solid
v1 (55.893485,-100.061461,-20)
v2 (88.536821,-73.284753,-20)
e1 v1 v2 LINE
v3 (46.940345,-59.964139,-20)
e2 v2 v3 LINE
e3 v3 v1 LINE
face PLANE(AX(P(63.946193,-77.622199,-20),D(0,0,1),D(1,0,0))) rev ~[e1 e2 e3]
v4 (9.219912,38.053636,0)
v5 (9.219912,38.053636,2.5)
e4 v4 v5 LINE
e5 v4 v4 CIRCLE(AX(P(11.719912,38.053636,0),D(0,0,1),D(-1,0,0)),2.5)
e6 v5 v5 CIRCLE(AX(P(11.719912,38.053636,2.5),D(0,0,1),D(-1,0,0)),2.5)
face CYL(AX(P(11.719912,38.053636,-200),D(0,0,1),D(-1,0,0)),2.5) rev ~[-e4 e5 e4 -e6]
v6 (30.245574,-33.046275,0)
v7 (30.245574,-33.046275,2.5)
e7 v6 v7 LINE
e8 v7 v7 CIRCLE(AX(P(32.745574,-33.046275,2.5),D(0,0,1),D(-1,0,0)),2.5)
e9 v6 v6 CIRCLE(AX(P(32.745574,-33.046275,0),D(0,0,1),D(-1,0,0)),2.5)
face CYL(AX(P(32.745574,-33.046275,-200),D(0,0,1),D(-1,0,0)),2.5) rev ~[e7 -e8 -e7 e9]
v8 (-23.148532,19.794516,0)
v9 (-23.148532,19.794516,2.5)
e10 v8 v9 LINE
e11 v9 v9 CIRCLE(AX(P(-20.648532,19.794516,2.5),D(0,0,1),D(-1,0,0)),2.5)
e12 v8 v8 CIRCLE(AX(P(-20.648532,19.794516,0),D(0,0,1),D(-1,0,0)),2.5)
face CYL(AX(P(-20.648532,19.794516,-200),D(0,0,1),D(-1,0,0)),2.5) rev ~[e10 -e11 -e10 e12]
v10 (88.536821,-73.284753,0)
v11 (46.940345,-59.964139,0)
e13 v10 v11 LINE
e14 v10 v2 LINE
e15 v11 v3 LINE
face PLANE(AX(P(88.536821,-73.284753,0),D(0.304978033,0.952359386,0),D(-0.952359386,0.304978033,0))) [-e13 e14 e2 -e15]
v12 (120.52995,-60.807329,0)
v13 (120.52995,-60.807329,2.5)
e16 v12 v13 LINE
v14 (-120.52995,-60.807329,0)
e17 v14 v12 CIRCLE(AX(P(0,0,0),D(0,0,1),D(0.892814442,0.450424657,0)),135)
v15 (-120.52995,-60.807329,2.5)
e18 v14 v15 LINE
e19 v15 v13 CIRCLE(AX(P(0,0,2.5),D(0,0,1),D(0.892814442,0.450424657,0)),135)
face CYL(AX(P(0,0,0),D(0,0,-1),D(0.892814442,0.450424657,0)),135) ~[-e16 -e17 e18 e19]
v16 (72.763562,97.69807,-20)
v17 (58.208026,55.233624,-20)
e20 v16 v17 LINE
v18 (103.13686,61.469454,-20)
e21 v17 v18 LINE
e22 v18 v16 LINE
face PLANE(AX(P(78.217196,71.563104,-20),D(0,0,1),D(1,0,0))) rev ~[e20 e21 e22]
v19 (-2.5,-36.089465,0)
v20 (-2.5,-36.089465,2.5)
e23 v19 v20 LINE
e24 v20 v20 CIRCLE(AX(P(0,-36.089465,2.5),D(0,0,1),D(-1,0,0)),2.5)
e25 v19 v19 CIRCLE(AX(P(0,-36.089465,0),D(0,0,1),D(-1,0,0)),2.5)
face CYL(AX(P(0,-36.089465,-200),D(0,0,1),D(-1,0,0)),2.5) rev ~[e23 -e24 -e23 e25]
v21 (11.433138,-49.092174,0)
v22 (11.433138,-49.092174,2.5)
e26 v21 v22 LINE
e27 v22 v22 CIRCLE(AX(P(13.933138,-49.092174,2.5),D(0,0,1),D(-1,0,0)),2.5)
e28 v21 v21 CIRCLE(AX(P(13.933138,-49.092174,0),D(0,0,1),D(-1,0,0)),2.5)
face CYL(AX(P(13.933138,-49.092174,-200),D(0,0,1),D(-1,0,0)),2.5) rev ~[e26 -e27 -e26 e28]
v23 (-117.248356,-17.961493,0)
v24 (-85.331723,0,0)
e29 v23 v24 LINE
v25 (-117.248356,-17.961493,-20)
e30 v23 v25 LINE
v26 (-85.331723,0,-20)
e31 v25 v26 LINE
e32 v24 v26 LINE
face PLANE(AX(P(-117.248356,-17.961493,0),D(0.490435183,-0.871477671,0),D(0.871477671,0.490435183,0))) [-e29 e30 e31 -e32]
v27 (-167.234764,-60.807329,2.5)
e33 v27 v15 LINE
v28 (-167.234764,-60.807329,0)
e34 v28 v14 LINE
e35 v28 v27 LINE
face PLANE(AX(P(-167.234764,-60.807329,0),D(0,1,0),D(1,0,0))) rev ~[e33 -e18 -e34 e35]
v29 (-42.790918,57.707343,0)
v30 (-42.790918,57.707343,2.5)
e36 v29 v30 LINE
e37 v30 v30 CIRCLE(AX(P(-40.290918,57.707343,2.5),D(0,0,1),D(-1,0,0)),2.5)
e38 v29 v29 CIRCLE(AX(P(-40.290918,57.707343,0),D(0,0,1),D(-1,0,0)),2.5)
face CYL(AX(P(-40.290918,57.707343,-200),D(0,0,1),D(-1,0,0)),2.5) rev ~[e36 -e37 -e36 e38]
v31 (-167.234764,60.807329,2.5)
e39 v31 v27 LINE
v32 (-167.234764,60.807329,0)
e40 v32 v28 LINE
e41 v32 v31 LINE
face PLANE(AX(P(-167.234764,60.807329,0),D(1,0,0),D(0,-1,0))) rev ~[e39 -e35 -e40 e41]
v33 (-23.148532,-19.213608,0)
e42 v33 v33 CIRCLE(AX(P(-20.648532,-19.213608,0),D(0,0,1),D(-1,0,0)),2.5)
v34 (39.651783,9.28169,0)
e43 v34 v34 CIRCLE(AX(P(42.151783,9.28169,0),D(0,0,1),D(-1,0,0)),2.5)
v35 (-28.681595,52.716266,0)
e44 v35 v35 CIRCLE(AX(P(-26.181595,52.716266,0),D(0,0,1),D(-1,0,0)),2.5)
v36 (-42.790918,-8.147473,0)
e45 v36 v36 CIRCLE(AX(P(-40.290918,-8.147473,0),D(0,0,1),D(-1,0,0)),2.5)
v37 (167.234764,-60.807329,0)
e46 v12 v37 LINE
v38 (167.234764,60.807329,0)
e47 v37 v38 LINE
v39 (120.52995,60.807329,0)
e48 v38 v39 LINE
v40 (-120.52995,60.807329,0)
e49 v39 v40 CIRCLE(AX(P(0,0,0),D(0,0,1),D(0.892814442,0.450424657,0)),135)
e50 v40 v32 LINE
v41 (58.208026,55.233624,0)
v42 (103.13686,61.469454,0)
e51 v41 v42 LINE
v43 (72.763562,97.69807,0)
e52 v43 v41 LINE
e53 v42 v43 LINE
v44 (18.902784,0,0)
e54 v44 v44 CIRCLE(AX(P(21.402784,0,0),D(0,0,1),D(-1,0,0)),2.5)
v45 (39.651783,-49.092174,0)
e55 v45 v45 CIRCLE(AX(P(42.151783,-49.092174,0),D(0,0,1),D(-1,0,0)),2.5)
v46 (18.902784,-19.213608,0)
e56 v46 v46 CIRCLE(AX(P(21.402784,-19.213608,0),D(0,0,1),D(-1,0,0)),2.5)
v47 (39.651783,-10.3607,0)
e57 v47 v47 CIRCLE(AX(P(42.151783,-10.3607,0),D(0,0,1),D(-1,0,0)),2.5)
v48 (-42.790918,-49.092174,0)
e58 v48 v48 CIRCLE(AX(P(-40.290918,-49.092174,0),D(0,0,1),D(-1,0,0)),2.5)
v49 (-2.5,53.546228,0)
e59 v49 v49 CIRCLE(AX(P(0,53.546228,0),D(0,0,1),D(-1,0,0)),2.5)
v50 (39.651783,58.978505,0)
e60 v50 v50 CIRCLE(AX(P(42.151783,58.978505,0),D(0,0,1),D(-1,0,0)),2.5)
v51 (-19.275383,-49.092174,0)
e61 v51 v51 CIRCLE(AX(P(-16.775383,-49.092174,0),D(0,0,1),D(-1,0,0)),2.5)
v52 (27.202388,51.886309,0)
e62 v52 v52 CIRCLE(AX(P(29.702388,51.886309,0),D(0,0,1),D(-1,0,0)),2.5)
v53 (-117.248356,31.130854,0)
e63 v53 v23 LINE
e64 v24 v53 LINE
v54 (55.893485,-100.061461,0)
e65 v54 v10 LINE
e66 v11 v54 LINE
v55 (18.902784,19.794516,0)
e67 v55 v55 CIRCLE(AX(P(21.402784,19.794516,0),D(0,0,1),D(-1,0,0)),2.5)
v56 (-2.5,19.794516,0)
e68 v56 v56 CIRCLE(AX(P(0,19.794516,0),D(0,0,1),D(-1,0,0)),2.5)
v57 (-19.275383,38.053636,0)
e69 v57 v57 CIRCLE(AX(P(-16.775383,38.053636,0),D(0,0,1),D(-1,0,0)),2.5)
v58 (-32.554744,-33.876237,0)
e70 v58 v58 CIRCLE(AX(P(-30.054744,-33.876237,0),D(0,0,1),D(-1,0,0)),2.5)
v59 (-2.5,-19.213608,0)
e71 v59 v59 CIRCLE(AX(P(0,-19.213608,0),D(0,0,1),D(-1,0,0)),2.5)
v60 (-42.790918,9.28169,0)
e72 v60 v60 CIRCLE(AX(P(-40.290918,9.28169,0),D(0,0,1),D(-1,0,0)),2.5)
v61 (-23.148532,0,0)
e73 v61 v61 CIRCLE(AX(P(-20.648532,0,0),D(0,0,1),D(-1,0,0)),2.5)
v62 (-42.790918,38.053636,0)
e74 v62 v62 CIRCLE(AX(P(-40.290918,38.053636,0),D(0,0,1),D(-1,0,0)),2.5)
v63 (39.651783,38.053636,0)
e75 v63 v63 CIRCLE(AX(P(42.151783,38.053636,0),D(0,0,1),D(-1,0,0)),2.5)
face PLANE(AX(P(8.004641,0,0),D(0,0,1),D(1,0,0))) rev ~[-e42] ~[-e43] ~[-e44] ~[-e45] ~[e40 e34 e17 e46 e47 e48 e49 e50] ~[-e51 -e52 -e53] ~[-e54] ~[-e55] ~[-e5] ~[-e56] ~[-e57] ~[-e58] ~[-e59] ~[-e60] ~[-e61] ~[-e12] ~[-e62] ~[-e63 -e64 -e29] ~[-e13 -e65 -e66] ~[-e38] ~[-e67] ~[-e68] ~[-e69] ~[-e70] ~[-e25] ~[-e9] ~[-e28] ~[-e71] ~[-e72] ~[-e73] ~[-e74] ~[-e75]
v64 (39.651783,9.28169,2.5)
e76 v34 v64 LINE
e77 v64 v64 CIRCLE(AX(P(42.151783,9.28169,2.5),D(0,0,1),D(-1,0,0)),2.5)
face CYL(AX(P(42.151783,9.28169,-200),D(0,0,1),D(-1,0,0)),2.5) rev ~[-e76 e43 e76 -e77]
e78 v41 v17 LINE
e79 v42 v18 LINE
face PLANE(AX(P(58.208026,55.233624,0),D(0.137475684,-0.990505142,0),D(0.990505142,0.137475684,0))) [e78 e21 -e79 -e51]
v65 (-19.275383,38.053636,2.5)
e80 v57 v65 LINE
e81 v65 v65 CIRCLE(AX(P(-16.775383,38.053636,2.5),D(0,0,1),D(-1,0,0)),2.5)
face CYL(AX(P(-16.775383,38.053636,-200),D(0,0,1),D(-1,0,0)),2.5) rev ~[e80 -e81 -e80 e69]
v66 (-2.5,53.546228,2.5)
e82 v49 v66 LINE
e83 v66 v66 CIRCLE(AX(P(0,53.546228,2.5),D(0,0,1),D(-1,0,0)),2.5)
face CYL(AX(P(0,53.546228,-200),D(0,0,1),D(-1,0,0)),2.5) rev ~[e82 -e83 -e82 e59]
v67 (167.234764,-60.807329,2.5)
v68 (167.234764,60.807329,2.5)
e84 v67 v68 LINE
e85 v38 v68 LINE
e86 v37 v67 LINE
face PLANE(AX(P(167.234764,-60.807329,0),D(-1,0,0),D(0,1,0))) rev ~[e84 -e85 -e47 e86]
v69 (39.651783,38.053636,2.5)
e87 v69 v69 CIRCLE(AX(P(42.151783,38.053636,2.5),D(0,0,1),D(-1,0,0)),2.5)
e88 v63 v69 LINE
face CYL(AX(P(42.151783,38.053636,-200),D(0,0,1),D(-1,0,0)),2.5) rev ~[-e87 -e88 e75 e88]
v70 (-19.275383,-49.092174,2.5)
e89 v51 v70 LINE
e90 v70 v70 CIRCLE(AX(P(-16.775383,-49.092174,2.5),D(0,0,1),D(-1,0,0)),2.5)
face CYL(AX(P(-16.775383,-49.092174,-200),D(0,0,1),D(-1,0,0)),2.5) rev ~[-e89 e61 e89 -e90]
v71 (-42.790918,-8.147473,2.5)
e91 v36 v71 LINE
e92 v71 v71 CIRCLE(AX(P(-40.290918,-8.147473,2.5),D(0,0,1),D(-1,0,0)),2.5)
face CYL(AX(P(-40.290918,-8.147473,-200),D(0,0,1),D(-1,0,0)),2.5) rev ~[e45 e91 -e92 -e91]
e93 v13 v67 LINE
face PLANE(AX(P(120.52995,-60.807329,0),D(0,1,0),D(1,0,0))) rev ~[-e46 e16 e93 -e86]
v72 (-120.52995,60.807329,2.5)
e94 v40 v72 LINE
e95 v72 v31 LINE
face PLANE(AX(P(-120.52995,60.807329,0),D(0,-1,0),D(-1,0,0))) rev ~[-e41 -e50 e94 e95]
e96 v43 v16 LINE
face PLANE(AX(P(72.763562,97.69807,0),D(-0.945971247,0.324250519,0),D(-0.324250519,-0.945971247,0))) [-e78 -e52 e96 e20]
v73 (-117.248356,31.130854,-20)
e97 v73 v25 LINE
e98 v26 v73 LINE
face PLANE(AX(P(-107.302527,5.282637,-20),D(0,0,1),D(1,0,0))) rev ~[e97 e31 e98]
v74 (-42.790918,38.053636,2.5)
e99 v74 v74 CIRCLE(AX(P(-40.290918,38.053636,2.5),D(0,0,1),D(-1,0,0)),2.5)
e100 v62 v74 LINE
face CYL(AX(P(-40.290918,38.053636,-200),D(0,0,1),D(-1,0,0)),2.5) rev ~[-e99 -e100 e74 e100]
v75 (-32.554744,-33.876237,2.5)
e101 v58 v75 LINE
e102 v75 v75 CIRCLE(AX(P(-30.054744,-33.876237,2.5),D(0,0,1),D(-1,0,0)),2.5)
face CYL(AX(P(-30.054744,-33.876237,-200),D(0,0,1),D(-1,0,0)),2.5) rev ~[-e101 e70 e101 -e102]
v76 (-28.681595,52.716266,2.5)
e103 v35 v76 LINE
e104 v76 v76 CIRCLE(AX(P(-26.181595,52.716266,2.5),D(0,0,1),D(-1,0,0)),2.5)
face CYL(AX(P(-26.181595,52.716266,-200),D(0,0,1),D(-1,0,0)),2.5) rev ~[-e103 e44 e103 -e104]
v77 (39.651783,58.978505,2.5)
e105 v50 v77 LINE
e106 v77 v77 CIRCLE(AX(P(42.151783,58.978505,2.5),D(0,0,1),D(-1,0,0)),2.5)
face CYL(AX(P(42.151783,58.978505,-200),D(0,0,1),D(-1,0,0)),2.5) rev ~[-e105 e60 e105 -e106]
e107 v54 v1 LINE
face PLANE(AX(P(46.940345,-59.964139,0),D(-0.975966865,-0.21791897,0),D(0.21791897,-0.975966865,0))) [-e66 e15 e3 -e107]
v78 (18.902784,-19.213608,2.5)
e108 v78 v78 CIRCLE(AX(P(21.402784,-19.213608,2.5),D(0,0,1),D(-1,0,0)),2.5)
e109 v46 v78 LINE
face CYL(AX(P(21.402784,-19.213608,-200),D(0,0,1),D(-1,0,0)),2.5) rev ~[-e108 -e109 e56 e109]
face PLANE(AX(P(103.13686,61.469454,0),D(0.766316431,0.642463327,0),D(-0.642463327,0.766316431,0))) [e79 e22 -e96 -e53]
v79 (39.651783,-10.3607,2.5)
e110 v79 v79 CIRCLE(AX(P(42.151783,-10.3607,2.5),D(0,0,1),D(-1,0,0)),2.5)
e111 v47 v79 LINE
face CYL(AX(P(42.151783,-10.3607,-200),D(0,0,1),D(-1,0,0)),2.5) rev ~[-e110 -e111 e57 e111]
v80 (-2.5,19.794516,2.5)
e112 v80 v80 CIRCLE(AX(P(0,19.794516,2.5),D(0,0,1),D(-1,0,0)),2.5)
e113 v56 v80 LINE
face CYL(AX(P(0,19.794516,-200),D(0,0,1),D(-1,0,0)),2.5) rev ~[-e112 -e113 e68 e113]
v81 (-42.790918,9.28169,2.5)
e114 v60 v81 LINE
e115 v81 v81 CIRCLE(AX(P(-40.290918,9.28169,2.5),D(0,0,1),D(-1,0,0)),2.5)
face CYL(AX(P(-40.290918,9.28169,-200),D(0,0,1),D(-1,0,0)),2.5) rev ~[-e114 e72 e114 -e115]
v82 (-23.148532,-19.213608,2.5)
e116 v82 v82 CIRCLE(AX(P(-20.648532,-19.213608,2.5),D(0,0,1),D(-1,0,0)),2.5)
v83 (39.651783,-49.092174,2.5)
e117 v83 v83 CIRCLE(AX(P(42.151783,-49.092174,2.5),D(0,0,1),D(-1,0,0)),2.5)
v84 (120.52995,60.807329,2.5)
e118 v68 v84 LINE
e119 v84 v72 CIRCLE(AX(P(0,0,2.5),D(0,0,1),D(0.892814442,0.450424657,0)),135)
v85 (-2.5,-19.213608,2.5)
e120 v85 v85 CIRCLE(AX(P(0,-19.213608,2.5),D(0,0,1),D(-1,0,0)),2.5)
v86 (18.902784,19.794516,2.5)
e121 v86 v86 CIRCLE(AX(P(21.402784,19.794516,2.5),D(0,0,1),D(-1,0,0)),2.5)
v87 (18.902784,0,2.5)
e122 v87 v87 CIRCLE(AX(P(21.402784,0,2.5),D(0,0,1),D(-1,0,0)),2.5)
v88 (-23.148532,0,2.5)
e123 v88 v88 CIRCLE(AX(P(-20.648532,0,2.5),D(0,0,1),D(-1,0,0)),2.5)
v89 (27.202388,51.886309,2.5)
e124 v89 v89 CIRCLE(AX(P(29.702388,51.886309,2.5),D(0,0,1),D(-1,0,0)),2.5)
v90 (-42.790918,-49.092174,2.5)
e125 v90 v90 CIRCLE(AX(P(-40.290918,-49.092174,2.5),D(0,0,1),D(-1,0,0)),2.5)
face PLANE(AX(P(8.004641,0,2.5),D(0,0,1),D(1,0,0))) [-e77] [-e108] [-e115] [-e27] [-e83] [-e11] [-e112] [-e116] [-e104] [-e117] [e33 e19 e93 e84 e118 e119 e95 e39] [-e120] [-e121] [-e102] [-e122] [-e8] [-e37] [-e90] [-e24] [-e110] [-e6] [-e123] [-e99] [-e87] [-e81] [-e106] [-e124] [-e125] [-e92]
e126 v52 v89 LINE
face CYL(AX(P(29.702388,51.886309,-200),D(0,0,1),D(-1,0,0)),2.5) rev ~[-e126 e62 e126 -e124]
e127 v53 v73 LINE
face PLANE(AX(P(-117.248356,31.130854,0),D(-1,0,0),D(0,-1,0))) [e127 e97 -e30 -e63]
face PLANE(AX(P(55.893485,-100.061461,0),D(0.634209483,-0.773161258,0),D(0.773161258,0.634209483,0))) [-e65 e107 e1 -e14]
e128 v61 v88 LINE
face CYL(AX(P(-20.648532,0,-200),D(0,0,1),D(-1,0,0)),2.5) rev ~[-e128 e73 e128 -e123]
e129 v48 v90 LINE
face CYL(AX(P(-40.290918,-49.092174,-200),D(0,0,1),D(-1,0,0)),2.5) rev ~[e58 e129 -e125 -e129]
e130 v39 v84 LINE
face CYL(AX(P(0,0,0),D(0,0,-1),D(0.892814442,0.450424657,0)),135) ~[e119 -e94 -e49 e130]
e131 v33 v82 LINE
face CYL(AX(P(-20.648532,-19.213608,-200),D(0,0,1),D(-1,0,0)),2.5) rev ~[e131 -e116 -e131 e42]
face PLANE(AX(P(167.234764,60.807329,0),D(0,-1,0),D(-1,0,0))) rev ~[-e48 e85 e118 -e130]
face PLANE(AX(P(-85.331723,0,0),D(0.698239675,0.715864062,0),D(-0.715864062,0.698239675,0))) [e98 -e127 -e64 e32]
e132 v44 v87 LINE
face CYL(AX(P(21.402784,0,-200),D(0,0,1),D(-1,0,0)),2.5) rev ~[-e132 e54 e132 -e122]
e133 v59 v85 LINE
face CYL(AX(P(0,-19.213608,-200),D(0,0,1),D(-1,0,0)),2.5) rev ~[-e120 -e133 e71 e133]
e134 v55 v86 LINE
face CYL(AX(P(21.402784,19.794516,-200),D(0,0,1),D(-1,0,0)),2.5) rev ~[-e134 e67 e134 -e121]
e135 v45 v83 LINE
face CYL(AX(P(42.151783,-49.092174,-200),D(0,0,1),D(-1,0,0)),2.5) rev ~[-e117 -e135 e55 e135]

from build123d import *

# Parameters (mm, degrees)
F1_DEPTH = 2.5
F2_DEPTH = 20
F3_D     = 5
F3_DEPTH = 200
F3_TIP   = 1.5021515476


# Not quite as in the source:
# - a feature names something its author has since deleted; it is built from what else it names


with BuildPart() as f1:
    # F0 (on Top) → F1 (new body)
    with BuildSketch(Plane.XY):
        with BuildLine():
            ThreePointArc((120.5299497215, -60.8073286712), (131.3326753181, -31.252654188), (135, 0))
            ThreePointArc((135, 0), (131.3326753181, 31.252654188), (120.5299497215, 60.8073286712))
            ThreePointArc((120.5299497215, 60.8073286712), (0, 135), (-120.5299497215, 60.8073286712))
            ThreePointArc((-120.5299497215, 60.8073286712), (-135, 0), (-120.5299497215, -60.8073286712))
            ThreePointArc((-120.5299497215, -60.8073286712), (0, -135), (120.5299497215, -60.8073286712))
        make_face()
        Polygon((88.5368213058, -73.284752667), (55.893484503, -100.0614613295), (46.9403453171, -59.9641390145), align=None, mode=Mode.SUBTRACT)
        Polygon((-117.2483563423, -17.961492762), (-117.2483563423, 31.1308540404), (-85.331723094, 0), align=None, mode=Mode.SUBTRACT)
        Polygon((58.2080259919, 55.2336238325), (72.7635622025, 97.6980701089), (103.1368598342, 61.4694543183), align=None, mode=Mode.SUBTRACT)
        with BuildLine():
            ThreePointArc((-120.5299497215, -60.8073286712), (-135, 0), (-120.5299497215, 60.8073286712))
            Line((-120.5299497215, 60.8073286712), (-167.2347635031, 60.8073286712))
            Line((-167.2347635031, 60.8073286712), (-167.2347635031, -60.8073286712))
            Line((-167.2347635031, -60.8073286712), (-120.5299497215, -60.8073286712))
        make_face()
        with BuildLine():
            ThreePointArc((120.5299497215, 60.8073286712), (131.3326753181, 31.252654188), (135, 0))
            ThreePointArc((135, 0), (131.3326753181, -31.252654188), (120.5299497215, -60.8073286712))
            Line((120.5299497215, -60.8073286712), (167.2347635031, -60.8073286712))
            Line((167.2347635031, -60.8073286712), (167.2347635031, 60.8073286712))
            Line((167.2347635031, 60.8073286712), (120.5299497215, 60.8073286712))
        make_face()
        Polygon((-85.331723094, 0), (-117.2483563423, 31.1308540404), (-117.2483563423, -17.961492762), align=None)
        Polygon((103.1368598342, 61.4694543183), (72.7635622025, 97.6980701089), (58.2080259919, 55.2336238325), align=None)
        Polygon((46.9403453171, -59.9641390145), (55.893484503, -100.0614613295), (88.5368213058, -73.284752667), align=None)
    extrude(amount=F1_DEPTH)

    # F0 (on Top) → F2 (join)
    with BuildSketch(Plane.XY):
        Polygon((-85.331723094, 0), (-117.2483563423, 31.1308540404), (-117.2483563423, -17.961492762), align=None)
        Polygon((103.1368598342, 61.4694543183), (72.7635622025, 97.6980701089), (58.2080259919, 55.2336238325), align=None)
        Polygon((46.9403453171, -59.9641390145), (55.893484503, -100.0614613295), (88.5368213058, -73.284752667), align=None)
    extrude(amount=-F2_DEPTH)

    # F3
    with Locations(Plane(origin=(0, 0, 0), x_dir=(1, 0, 0), z_dir=(0, 0, -1))):
        with Locations((-40.2909182012, -57.7073432505), (-40.2909182012, -38.0536355078), (-40.2909182012, -9.2816902325), (-40.2909182012, 8.147473447), (-40.2909182012, 49.0921735764), (-30.054744333, 33.8762365282), (-16.7753826827, 49.0921735764), (-20.6485316157, 19.2136075348), (-20.6485316157, 0), (-20.6485316157, -19.7945162654), (-16.7753826827, -38.0536355078), (-26.1815954, -52.7162663639), (0, -53.5462275147), (11.7199122906, -38.0536355078), (0, -19.7945162654), (0, 19.2136075348), (0, 36.0894650221), (13.9331379905, 49.0921735764), (42.1517826617, 49.0921735764), (32.7455736697, 33.0462753773), (21.4027836919, 19.2136075348), (21.4027836919, 0), (21.4027836919, -19.7945162654), (29.7023877501, -51.8863089383), (42.1517826617, -58.9785054326), (42.1517826617, -38.0536355078), (42.1517826617, -9.2816902325), (42.1517826617, 10.3607000783)):
            Hole(F3_D / 2, depth=F3_DEPTH)
            with Locations((0, 0, -(F3_DEPTH + F3_TIP / 2))):  # 118° drill point
                Cone(0, F3_D / 2, F3_TIP, mode=Mode.SUBTRACT)


solid = f1.part
